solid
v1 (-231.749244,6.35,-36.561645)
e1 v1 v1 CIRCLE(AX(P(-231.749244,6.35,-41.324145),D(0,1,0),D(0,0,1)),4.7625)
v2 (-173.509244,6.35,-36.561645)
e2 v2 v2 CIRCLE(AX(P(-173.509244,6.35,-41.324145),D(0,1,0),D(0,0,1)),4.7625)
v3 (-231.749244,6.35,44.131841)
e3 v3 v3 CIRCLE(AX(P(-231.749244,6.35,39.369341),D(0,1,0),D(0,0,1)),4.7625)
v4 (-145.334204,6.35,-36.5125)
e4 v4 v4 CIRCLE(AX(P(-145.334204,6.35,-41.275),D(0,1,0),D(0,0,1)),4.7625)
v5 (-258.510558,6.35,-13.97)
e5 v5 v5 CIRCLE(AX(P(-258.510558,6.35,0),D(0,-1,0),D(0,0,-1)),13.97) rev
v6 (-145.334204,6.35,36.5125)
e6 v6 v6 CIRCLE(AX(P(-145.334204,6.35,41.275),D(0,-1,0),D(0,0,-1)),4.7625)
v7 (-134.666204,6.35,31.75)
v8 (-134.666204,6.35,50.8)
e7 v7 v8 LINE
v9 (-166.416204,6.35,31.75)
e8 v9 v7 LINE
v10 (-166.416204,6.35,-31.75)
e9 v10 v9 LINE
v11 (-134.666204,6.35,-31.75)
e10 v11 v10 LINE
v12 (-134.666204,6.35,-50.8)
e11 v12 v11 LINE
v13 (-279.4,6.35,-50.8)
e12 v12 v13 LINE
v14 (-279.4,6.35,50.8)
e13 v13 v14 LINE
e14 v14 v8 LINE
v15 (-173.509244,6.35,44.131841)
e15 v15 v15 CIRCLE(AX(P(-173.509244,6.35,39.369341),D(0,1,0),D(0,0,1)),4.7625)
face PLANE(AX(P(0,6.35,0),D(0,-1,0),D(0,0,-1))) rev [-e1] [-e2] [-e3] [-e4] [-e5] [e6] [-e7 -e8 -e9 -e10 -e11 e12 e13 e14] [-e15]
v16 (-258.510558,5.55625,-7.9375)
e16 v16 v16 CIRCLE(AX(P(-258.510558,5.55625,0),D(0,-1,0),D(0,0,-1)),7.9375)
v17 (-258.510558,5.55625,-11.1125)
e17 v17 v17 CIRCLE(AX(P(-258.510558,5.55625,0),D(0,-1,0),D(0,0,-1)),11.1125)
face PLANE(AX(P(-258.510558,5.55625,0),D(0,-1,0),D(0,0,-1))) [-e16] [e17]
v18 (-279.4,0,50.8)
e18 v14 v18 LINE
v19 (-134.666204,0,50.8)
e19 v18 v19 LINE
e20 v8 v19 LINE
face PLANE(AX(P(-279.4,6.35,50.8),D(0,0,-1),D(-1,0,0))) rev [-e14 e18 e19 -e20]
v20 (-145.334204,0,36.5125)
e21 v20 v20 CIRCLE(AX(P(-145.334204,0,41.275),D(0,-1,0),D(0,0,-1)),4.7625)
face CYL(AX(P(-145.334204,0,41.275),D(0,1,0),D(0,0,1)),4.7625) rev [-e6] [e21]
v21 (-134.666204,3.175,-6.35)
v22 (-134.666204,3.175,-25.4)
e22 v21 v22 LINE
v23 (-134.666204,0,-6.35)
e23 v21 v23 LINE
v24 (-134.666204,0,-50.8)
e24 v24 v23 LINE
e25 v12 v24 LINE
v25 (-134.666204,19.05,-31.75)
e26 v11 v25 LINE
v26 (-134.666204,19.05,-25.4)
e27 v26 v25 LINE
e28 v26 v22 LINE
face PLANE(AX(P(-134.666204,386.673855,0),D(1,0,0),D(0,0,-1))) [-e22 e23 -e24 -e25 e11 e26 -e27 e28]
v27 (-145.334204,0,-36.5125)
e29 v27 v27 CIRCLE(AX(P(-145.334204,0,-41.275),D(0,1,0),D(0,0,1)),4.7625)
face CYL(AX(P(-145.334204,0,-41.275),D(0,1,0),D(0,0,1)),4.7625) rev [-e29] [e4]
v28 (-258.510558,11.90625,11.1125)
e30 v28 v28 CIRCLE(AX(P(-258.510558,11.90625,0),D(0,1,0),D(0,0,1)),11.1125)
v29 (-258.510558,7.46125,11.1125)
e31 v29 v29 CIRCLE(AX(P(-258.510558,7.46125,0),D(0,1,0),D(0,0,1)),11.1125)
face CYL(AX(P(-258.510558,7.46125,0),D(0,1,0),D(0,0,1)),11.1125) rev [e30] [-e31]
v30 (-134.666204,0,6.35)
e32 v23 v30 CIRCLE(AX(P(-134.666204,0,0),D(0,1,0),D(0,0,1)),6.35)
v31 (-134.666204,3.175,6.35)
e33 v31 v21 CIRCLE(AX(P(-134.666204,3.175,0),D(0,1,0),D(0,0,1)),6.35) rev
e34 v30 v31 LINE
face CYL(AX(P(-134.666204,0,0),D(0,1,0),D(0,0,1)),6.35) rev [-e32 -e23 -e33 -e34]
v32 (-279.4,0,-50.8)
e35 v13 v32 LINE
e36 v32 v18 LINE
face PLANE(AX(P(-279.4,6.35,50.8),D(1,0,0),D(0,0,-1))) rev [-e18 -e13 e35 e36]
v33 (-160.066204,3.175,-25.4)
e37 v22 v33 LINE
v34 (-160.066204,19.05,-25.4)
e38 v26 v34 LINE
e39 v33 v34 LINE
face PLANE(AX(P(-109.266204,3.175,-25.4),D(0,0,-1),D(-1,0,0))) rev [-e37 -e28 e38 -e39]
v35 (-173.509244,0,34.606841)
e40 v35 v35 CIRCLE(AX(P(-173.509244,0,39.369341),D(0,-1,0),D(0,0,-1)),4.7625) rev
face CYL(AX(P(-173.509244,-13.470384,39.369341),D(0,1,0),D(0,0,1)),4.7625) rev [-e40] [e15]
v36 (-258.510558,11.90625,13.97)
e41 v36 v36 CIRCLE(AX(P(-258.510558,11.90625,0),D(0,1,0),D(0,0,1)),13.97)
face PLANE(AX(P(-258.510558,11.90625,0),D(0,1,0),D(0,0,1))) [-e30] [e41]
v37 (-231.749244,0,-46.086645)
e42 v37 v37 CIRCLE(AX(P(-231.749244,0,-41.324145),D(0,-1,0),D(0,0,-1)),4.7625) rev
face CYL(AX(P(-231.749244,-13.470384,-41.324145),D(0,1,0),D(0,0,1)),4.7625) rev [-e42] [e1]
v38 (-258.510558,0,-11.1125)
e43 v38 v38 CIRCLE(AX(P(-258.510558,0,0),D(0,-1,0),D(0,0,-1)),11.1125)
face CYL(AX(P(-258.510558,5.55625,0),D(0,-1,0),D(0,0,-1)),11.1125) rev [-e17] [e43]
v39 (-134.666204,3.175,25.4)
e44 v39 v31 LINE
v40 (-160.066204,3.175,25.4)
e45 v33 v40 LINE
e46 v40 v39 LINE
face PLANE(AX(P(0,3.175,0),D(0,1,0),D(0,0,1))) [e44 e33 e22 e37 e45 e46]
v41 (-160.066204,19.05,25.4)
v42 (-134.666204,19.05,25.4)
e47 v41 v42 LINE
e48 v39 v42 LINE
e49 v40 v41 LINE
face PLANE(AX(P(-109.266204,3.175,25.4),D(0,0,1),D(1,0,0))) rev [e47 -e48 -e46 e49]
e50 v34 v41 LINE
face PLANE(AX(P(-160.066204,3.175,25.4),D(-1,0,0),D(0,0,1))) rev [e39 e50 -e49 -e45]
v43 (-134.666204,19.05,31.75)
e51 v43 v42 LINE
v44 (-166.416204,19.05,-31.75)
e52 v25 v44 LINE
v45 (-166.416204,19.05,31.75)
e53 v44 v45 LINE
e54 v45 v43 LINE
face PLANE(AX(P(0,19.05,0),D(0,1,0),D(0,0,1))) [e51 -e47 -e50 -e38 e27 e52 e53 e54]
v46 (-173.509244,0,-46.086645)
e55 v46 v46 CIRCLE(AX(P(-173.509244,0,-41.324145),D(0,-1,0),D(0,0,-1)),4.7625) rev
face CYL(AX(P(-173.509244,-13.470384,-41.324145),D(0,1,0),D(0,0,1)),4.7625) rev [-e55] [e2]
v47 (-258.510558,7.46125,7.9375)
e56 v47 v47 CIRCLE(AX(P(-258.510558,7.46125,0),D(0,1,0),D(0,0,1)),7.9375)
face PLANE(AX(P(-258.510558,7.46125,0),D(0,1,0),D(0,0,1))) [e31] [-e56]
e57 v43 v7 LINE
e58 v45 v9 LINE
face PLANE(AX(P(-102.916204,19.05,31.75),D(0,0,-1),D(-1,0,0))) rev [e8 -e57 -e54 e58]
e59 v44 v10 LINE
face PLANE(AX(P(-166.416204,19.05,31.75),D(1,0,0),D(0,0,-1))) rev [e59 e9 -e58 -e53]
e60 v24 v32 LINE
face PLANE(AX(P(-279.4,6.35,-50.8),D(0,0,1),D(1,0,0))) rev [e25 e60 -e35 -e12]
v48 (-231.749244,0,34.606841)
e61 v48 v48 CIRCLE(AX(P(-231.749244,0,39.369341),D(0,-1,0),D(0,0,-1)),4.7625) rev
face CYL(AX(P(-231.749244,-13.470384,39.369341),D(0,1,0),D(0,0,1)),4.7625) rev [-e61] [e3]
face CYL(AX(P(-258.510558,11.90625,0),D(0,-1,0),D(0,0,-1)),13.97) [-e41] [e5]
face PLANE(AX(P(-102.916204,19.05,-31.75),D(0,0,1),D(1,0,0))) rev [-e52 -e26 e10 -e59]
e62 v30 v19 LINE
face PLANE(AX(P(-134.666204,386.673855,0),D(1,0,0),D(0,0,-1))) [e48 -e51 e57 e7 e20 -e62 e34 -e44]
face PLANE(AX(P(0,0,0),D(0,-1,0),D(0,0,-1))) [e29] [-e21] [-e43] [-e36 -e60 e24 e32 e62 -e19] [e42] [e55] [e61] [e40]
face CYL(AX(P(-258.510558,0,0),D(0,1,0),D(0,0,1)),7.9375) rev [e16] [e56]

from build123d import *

# Parameters (mm, degrees)
SKETCH1_W               = 279.4
SKETCH1_H               = 101.6
BOSS_EXTRUDE1_DEPTH     = 6.35
SKETCH2_R               = 13.97
BOSS_EXTRUDE3_DEPTH     = 5.55625
SKETCH9_R               = 11.1125
CUT_EXTRUDE4_DEPTH      = 4.445
CUT_EXTRUDE5_START      = -5.55625
SKETCH10_R              = 11.1125
CUT_EXTRUDE5_DEPTH      = 5.55625
SKETCH11_R              = 7.9375
CUT_EXTRUDE6_DEPTH      = 285.078633923
SKETCH12_R              = 6.35
CUT_EXTRUDE7_DEPTH      = 285.051619429
SKETCH22_W              = 63.5
SKETCH22_H              = 63.5
BOSS_EXTRUDE7_DEPTH     = 12.7
SKETCH25_W              = 50.8
SKETCH25_H              = 50.8
CUT_EXTRUDE11_DEPTH     = 15.875
SKETCH32_R              = 4.7625
CUT_EXTRUDE12_DEPTH     = 6.35
SKETCH38_W              = 46.99
SKETCH38_H              = 18.470251096
CUT_EXTRUDE13_DEPTH     = 6.35
SKETCH60_R              = 4.7625
CUT_EXTRUDE23_DEPTH     = 6.35
CUT_EXTRUDE24_START     = -6.35
CUT_EXTRUDE24_OUTLINE_R = 4.7625
CUT_EXTRUDE24_DEPTH     = 19.05
SKETCH62_R              = 4.7625
CUT_EXTRUDE25_DEPTH     = 285.264471927


# Read off the part's stored shape, not the designer's step: Cut-Extrude24
with BuildPart() as part:
    # Sketch1 → Boss-Extrude1 (new body)
    with BuildSketch(Plane(origin=(0, 0, 0), x_dir=(1, 0, 0), z_dir=(0, 1, 0))):
        with Locations((-139.7, 0)):
            Rectangle(SKETCH1_W, SKETCH1_H)
    extrude(amount=BOSS_EXTRUDE1_DEPTH)

    # Sketch2 → Boss-Extrude3 (add)
    with BuildSketch(Plane(origin=(0, 6.35, 0), x_dir=(1, 0, 0), z_dir=(0, 1, 0))):
        with Locations(Location((-258.510557857, 0, 0), (0, 0, 90))):
            Circle(SKETCH2_R)
    extrude(amount=BOSS_EXTRUDE3_DEPTH)

    # Sketch9 → Cut-Extrude4 (cut)
    with BuildSketch(Plane(origin=(0, 11.90625, 0), x_dir=(1, 0, 0), z_dir=(0, 1, 0))):
        with Locations(Location((-258.510557857, 0, 0), (0, 0, 270))):
            Circle(SKETCH9_R)
    extrude(amount=-CUT_EXTRUDE4_DEPTH, mode=Mode.SUBTRACT)

    # Sketch10 → Cut-Extrude5 (cut)
    with BuildSketch(Plane(origin=(0, 0, 0), x_dir=(-1, 0, 0), z_dir=(0, -1, 0)).offset(CUT_EXTRUDE5_START)):
        with Locations(Location((258.510557857, 0, 0), (0, 0, 270))):
            Circle(SKETCH10_R)
    extrude(amount=CUT_EXTRUDE5_DEPTH, mode=Mode.SUBTRACT)

    # Sketch11 → Cut-Extrude6 (cut, through all)
    with BuildSketch(Plane(origin=(0, 7.46125, 0), x_dir=(1, 0, 0), z_dir=(0, 1, 0))):
        with Locations(Location((-258.510557857, 0, 0), (0, 0, 270))):
            Circle(SKETCH11_R)
    extrude(amount=-CUT_EXTRUDE6_DEPTH, mode=Mode.SUBTRACT)

    # Sketch12 → Cut-Extrude7 (cut, through all)
    with BuildSketch(Plane(origin=(0, 6.35, 0), x_dir=(1, 0, 0), z_dir=(0, 1, 0))):
        with Locations(Location((-134.666203771, 0, 0), (0, 0, 270))):
            Circle(SKETCH12_R)
    extrude(amount=-CUT_EXTRUDE7_DEPTH, mode=Mode.SUBTRACT)

    # Sketch22 → Boss-Extrude7 (add)
    with BuildSketch(Plane(origin=(0, 6.35, 0), x_dir=(1, 0, 0), z_dir=(0, 1, 0))):
        with Locations((-134.666203771, 0)):
            Rectangle(SKETCH22_W, SKETCH22_H)
    extrude(amount=BOSS_EXTRUDE7_DEPTH)

    # Sketch25 → Cut-Extrude11 (cut)
    with BuildSketch(Plane(origin=(0, 19.05, 0), x_dir=(1, 0, 0), z_dir=(0, 1, 0))):
        with Locations((-134.666203771, 0)):
            Rectangle(SKETCH25_W, SKETCH25_H)
    extrude(amount=-CUT_EXTRUDE11_DEPTH, mode=Mode.SUBTRACT)

    # Sketch32 → Cut-Extrude12 (cut)
    with BuildSketch(Plane(origin=(0, 6.35, 0), x_dir=(1, 0, 0), z_dir=(0, 1, 0))):
        with Locations(Location((-67.44195898, -40.64, 0), (0, 0, 270))):
            Circle(SKETCH32_R)
        with Locations(Location((-81.41195898, -40.64, 0), (0, 0, 270))):
            Circle(SKETCH32_R)
        with Locations(Location((-67.44195898, 40.64, 0), (0, 0, 270))):
            Circle(SKETCH32_R)
        with Locations(Location((-81.41195898, 40.64, 0), (0, 0, 270))):
            Circle(SKETCH32_R)
    extrude(amount=-CUT_EXTRUDE12_DEPTH, mode=Mode.SUBTRACT)

    # Sketch38 → Cut-Extrude13 (cut)
    with BuildSketch(Plane(origin=(0, 6.35, 0), x_dir=(1, 0, 0), z_dir=(0, 1, 0))):
        with Locations((-23.495, -24.777709652)):
            Rectangle(SKETCH38_W, SKETCH38_H)
    extrude(amount=-CUT_EXTRUDE13_DEPTH, mode=Mode.SUBTRACT)

    # Sketch60 → Cut-Extrude23 (cut)
    with BuildSketch(Plane(origin=(0, 6.35, 0), x_dir=(1, 0, 0), z_dir=(0, 1, 0))):
        with Locations(Location((-231.7492444, 41.324145444, 0), (0, 0, 270))):
            Circle(SKETCH60_R)
        with Locations(Location((-231.7492444, -39.369341378, 0), (0, 0, 270))):
            Circle(SKETCH60_R)
        with Locations(Location((-173.509244294, -39.369341378, 0), (0, 0, 270))):
            Circle(SKETCH60_R)
        with Locations(Location((-173.509244294, 41.324145444, 0), (0, 0, 270))):
            Circle(SKETCH60_R)
    extrude(amount=-CUT_EXTRUDE23_DEPTH, mode=Mode.SUBTRACT)

    # Cut-Extrude24 outline → Cut-Extrude24 (cut)
    with BuildSketch(Plane(origin=(0, 6.35, 0), x_dir=(1, 0, 0), z_dir=(0, 1, 0)).offset(CUT_EXTRUDE24_START)):
        with BuildLine():
            Line((-134.666203771, -50.8), (0, -50.8))
            Line((0, -50.8), (0, -34.0128352))
            Line((0, -34.0128352), (-46.99, -34.0128352))
            Line((-46.99, -34.0128352), (-46.99, -15.542584104))
            Line((-46.99, -15.542584104), (0, -15.542584104))
            Line((0, -15.542584104), (0, 50.8))
            Line((0, 50.8), (-134.666203771, 50.8))
            Line((-134.666203771, 50.8), (-134.666203771, 6.35))
            ThreePointArc((-134.666203771, 6.35), (-128.316203771, 0), (-134.666203771, -6.35))
            Line((-134.666203771, -6.35), (-134.666203771, -50.8))
        make_face()
        with Locations((-81.41195898, -40.64)):
            Circle(CUT_EXTRUDE24_OUTLINE_R, mode=Mode.SUBTRACT)
        with Locations((-67.44195898, -40.64)):
            Circle(CUT_EXTRUDE24_OUTLINE_R, mode=Mode.SUBTRACT)
        with Locations((-81.41195898, 40.64)):
            Circle(CUT_EXTRUDE24_OUTLINE_R, mode=Mode.SUBTRACT)
        with Locations((-67.44195898, 40.64)):
            Circle(CUT_EXTRUDE24_OUTLINE_R, mode=Mode.SUBTRACT)
    extrude(amount=CUT_EXTRUDE24_DEPTH, mode=Mode.SUBTRACT)

    # Sketch62 → Cut-Extrude25 (cut, through all)
    with BuildSketch(Plane(origin=(0, 6.35, 0), x_dir=(1, 0, 0), z_dir=(0, 1, 0))):
        with Locations(Location((-145.334203771, 41.275, 0), (0, 0, 270))):
            Circle(SKETCH62_R)
    cut_extrude25 = extrude(amount=-CUT_EXTRUDE25_DEPTH, mode=Mode.SUBTRACT)

    # Mirror1: Cut-Extrude25 across plane
    add(cut_extrude25.mirror(Plane.XY), mode=Mode.SUBTRACT)


solid = part.part
